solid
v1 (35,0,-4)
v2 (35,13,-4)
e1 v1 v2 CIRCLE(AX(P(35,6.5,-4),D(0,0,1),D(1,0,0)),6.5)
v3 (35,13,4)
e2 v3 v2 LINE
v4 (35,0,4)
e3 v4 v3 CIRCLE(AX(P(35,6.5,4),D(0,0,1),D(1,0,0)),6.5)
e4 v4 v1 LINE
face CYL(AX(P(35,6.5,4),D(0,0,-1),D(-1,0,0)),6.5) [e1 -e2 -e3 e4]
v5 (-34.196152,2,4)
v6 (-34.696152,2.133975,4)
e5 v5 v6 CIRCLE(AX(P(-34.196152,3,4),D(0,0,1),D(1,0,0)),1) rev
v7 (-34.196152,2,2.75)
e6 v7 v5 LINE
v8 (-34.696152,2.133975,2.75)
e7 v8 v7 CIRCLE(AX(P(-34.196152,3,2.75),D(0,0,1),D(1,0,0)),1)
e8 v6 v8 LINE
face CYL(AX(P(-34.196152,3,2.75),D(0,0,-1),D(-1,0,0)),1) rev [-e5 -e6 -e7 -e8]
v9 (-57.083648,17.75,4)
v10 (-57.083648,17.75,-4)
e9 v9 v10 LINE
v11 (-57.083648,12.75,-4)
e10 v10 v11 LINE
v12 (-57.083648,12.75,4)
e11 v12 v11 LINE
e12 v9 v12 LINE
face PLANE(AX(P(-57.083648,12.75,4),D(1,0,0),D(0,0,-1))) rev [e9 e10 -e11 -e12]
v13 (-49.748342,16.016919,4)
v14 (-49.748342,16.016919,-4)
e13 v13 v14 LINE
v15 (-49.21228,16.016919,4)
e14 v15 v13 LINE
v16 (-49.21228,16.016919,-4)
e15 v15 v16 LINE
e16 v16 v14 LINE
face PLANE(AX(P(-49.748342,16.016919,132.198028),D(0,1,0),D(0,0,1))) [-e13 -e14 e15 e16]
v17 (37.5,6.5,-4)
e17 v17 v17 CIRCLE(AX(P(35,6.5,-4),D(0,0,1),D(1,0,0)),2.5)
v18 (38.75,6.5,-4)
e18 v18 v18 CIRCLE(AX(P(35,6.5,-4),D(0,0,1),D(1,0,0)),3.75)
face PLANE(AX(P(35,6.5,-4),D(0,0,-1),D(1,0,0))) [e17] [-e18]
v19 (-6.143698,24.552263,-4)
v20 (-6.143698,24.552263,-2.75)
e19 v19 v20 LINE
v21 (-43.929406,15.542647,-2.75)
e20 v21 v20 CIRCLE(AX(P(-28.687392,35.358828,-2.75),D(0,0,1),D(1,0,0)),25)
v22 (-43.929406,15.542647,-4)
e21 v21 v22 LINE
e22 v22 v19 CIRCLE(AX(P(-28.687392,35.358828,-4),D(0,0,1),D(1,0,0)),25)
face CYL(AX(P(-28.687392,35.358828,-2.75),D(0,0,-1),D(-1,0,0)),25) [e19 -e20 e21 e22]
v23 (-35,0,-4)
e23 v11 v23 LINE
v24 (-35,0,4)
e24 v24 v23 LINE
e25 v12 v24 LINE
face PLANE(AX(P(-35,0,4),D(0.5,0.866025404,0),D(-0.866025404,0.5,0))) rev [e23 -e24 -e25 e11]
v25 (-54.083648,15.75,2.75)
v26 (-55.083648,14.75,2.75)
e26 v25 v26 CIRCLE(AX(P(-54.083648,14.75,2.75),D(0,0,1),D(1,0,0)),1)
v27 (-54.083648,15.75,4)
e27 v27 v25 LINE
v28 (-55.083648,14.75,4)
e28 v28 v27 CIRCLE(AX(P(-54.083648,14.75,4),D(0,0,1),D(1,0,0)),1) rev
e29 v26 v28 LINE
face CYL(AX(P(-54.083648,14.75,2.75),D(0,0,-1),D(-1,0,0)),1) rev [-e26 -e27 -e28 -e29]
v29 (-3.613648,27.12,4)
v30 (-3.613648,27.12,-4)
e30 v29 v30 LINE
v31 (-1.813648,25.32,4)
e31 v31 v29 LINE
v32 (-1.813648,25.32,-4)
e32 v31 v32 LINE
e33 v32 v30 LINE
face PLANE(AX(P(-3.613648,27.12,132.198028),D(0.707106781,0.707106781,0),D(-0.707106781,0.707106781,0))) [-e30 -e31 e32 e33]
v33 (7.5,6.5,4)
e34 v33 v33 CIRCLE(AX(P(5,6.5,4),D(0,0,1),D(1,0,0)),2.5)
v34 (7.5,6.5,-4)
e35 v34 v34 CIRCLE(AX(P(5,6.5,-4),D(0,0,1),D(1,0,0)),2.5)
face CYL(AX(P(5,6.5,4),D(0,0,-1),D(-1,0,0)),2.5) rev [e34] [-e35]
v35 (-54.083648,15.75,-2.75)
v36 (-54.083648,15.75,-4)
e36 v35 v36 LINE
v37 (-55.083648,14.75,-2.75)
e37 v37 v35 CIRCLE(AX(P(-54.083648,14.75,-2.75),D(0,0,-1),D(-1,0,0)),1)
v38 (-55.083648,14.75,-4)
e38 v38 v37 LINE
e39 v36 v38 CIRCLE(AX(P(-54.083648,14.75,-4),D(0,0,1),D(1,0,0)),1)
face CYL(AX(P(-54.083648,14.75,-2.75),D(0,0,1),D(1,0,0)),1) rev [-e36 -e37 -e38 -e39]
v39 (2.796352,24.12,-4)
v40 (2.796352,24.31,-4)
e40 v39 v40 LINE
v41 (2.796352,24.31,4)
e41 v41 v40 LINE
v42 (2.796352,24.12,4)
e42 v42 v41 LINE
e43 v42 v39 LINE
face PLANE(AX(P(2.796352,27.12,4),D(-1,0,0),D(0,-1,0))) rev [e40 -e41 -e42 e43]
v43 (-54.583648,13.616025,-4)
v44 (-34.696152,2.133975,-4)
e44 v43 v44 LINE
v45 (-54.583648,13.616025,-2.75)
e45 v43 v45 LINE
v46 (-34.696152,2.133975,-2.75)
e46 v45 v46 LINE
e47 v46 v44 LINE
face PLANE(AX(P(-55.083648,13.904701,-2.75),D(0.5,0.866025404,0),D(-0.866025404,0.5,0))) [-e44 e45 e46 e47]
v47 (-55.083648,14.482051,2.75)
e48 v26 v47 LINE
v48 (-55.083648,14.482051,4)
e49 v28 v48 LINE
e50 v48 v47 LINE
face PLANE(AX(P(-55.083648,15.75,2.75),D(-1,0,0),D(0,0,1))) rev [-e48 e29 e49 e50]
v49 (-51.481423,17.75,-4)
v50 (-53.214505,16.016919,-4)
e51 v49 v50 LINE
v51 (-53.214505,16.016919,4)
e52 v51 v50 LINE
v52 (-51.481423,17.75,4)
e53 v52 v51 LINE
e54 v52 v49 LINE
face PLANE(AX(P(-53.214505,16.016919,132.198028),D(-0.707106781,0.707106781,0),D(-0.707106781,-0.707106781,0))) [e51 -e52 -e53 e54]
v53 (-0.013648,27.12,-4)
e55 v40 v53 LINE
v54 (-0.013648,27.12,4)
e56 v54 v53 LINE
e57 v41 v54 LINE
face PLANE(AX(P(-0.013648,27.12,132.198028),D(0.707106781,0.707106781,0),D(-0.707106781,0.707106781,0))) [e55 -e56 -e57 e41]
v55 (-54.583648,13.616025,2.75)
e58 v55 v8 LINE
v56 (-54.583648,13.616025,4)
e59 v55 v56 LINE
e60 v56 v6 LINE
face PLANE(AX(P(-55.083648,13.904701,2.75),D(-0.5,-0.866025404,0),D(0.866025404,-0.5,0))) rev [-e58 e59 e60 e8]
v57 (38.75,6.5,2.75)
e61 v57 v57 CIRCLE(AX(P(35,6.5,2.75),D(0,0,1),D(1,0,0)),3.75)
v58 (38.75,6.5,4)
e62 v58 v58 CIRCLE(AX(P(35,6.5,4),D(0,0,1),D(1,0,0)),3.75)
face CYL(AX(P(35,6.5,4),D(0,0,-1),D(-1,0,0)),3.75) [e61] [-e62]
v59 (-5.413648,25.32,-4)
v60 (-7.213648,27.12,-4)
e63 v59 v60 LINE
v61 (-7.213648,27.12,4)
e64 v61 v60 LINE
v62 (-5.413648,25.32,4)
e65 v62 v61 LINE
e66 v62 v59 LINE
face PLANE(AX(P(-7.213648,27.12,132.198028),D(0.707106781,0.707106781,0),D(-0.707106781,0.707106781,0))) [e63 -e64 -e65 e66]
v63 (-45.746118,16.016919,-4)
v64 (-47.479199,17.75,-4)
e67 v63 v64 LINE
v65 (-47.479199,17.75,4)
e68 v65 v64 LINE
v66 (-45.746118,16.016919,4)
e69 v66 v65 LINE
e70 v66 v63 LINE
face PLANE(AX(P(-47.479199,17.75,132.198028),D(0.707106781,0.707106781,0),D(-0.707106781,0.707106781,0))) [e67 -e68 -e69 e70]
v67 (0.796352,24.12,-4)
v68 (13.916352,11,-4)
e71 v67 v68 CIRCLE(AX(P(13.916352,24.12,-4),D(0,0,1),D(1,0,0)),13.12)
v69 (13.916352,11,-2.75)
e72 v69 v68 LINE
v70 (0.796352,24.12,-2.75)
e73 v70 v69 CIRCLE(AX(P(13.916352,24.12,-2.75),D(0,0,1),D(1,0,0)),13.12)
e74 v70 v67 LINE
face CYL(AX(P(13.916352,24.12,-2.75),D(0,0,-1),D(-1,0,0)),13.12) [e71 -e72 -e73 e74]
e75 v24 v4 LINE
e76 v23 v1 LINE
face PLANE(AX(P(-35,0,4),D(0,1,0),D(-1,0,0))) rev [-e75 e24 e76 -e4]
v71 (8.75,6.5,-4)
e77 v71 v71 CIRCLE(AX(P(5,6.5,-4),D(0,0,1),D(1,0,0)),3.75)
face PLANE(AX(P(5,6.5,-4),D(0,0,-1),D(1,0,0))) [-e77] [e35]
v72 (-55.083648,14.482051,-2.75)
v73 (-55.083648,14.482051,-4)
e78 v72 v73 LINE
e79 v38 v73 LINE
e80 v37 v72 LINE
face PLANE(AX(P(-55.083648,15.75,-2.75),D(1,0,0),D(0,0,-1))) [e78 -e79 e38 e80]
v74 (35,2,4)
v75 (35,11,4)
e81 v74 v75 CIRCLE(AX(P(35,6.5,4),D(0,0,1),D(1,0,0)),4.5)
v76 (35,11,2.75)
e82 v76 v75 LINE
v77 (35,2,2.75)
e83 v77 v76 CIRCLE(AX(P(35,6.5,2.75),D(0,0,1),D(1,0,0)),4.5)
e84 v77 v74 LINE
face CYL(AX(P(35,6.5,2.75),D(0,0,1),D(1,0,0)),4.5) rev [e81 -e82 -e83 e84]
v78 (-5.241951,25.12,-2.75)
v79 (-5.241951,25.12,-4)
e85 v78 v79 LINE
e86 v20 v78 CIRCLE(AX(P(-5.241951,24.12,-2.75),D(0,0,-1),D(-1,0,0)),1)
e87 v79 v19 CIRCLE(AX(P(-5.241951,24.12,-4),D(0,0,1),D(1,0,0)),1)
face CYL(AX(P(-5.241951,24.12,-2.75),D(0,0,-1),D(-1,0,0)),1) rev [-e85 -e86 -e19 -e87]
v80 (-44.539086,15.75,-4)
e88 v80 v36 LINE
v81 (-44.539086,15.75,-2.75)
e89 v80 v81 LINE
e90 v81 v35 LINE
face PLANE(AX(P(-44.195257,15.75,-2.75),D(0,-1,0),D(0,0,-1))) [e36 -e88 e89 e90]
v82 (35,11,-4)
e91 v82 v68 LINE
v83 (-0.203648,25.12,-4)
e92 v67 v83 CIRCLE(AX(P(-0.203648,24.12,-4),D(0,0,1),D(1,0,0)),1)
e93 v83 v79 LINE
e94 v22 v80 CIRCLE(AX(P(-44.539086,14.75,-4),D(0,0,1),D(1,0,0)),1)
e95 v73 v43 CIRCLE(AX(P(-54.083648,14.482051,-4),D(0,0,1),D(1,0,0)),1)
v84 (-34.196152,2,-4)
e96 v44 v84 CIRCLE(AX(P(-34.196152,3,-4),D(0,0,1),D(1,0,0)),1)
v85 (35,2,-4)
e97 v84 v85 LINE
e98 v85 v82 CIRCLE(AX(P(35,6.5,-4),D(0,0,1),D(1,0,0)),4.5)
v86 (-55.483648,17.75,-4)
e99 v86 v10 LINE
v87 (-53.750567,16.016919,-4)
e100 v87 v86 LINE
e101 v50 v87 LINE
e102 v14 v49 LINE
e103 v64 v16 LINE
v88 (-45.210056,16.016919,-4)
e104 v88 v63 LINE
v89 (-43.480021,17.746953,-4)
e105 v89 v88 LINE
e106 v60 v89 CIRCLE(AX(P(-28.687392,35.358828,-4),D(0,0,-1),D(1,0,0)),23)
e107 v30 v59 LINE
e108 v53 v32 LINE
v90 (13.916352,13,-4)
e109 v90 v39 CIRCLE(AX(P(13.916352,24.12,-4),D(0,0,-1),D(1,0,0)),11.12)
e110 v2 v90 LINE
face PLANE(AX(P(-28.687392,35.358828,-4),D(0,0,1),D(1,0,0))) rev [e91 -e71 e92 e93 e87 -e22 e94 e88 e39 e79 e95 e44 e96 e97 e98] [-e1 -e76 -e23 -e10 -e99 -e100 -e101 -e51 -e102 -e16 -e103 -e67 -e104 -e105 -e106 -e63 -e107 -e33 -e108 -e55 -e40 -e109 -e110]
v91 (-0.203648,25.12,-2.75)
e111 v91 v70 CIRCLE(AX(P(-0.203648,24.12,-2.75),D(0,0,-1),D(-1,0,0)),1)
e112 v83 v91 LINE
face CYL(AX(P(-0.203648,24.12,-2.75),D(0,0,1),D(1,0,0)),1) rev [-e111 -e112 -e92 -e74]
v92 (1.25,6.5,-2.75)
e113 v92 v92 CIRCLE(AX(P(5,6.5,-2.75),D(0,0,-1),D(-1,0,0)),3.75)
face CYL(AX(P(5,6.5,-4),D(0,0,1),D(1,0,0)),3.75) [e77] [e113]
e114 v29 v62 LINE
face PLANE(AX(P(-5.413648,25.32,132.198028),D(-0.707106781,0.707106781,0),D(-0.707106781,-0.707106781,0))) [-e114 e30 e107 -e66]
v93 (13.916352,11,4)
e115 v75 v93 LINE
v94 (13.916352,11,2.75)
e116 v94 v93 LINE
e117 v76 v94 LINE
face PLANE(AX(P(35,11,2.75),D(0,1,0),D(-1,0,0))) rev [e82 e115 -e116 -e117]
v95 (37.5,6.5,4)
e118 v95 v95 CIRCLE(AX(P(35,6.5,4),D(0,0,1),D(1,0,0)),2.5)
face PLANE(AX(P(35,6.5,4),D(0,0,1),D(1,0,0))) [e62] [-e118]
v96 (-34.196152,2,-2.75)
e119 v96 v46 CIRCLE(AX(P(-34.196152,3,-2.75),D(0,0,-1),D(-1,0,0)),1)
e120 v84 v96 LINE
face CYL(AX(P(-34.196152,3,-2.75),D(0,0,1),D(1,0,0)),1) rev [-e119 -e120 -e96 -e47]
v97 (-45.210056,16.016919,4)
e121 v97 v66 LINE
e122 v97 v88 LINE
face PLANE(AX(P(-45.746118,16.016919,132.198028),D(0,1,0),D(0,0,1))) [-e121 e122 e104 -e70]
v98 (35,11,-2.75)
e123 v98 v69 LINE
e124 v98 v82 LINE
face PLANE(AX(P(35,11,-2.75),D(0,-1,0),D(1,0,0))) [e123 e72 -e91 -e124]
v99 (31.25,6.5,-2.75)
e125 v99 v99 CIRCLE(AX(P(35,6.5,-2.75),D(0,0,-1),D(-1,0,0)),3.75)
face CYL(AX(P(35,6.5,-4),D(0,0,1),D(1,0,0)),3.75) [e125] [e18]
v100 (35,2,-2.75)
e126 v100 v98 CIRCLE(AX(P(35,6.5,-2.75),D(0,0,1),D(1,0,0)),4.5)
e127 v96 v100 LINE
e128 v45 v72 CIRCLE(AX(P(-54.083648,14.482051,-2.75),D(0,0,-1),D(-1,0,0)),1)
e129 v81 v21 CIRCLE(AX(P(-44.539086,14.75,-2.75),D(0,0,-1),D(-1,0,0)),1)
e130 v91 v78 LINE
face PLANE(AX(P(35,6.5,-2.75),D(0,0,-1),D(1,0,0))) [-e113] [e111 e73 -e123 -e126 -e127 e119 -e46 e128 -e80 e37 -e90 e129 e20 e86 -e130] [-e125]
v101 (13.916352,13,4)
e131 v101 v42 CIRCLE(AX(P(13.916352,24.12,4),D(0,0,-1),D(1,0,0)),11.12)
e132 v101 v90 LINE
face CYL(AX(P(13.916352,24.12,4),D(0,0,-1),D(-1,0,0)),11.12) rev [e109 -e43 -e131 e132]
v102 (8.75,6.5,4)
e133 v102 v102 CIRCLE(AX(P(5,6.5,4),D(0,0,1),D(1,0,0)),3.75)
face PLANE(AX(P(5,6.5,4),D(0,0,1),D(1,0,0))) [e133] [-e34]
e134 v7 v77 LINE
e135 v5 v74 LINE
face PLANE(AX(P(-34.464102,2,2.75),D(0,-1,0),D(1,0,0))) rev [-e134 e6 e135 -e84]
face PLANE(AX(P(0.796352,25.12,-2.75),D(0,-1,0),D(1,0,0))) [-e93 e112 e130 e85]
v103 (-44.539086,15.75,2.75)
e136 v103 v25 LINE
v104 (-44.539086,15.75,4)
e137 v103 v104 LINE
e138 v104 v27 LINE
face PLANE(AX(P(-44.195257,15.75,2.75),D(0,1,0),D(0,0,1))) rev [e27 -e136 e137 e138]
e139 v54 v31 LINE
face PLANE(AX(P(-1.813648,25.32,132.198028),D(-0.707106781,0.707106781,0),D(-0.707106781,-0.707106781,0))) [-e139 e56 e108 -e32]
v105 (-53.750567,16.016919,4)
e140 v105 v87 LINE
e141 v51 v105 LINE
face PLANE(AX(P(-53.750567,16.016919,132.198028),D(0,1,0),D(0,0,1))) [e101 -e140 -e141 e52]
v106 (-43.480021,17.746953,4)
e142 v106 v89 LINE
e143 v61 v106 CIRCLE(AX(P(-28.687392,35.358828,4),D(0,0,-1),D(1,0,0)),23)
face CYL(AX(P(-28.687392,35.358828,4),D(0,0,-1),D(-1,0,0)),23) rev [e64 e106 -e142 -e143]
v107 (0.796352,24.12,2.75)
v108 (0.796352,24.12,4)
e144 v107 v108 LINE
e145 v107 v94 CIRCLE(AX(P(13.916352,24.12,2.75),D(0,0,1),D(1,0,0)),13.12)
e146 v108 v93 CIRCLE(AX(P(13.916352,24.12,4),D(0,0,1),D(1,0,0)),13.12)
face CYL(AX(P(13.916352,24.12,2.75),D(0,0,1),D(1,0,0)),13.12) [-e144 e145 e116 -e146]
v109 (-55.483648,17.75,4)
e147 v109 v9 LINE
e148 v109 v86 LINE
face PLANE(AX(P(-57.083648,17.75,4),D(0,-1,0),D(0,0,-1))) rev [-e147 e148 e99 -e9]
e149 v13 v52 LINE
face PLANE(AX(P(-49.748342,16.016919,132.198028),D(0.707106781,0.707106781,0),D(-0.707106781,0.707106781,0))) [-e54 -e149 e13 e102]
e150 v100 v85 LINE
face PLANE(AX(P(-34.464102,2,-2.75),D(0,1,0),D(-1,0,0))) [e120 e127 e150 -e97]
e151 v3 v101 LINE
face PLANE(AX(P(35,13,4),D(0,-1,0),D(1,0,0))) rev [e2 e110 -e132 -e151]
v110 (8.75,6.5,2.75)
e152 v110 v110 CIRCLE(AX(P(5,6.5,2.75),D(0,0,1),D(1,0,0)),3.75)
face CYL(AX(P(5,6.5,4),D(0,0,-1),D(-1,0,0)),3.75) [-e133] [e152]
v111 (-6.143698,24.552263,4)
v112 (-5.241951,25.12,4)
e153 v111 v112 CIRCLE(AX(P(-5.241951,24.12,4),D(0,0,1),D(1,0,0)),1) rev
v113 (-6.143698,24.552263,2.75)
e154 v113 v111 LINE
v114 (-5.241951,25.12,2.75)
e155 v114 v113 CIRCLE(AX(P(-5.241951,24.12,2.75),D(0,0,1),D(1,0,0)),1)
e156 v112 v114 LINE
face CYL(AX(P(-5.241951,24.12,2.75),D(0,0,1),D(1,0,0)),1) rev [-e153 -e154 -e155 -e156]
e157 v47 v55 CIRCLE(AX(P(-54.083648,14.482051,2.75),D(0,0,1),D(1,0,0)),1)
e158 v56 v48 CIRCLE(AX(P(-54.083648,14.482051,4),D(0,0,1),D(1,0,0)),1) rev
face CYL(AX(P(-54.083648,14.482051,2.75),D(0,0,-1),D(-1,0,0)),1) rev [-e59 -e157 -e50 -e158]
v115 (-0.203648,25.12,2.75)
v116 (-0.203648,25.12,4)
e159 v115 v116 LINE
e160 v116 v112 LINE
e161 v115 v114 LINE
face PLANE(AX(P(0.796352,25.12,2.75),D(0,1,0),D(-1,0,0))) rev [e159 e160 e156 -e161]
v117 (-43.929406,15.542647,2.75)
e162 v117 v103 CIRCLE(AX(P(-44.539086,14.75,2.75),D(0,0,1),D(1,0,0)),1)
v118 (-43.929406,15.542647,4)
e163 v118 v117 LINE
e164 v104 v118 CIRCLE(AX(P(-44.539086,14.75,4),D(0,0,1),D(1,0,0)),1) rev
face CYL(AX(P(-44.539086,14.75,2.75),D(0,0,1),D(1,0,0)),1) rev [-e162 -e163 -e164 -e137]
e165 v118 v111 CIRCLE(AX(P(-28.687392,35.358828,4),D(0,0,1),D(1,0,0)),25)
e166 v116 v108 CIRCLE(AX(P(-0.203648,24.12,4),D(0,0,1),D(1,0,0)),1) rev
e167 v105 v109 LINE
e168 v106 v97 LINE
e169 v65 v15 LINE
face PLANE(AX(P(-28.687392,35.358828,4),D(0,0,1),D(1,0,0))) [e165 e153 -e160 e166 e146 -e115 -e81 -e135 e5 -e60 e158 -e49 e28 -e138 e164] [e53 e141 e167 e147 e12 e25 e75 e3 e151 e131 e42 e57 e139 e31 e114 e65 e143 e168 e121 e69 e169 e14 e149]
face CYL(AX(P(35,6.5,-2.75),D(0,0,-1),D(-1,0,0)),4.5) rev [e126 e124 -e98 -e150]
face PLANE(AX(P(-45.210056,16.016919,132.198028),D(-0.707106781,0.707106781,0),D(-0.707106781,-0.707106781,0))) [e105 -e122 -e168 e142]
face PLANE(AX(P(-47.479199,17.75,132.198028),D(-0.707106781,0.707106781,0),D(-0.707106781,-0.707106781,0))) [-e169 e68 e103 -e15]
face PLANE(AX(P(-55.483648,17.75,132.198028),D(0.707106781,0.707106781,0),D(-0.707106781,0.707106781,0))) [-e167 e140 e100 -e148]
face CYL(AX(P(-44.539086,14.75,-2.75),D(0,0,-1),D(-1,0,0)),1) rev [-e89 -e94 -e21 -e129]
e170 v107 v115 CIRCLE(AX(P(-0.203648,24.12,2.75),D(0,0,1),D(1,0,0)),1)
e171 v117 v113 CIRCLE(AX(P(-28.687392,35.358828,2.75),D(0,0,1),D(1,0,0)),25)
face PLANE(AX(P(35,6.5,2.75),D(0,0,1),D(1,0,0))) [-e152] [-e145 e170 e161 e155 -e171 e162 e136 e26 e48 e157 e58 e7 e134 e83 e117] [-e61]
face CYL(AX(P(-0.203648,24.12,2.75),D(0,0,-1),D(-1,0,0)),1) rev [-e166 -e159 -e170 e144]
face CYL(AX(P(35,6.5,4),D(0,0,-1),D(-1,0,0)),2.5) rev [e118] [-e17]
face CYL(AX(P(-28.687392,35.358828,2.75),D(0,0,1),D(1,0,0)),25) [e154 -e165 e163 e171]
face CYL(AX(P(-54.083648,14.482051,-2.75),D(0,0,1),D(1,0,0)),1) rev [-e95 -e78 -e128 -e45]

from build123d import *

# Parameters (mm, degrees)
BOSS_EXTRUDE1_DEPTH     = 4
SKETCH2_R               = 2.5
CUT_EXTRUDE1_DEPTH      = 64.702725576
CUT_EXTRUDE2_DEPTH      = 1.25
SKETCH4_R               = 3.75
SKETCH4_R_2             = 2.5
BOSS_EXTRUDE2_DEPTH     = 1.25
CUT_EXTRUDE8_DEPTH      = 64.702725576
CUT_EXTRUDE8_DEPTH_BACK = 64.702725576
CUT_EXTRUDE9_DEPTH      = 64.702725576
CUT_EXTRUDE9_DEPTH_BACK = 64.702725576
FILLET5_R               = 1
FILLET6_R               = 1
FILLET7_R               = 1
FILLET8_R               = 1


with BuildPart() as part:
    # Sketch1 → Boss-Extrude1 (new, symmetric)
    with BuildSketch(Plane.XY):
        with BuildLine():
            Line((-35, 0), (35, 0))
            ThreePointArc((35, 0), (41.5, 6.5), (35, 13))
            Line((35, 13), (13.916352203, 13))
            ThreePointArc((13.916352203, 13), (6.053324797, 16.256972593), (2.796352203, 24.12))
            Line((2.796352203, 24.12), (2.796352203, 27.12))
            Line((2.796352203, 27.12), (-7.213647797, 27.12))
            ThreePointArc((-7.213647797, 27.12), (-22.934441841, 13.089935965), (-43.483647797, 17.75))
            Line((-43.483647797, 17.75), (-57.083647797, 17.75))
            Line((-57.083647797, 17.75), (-57.083647797, 12.75))
            Line((-57.083647797, 12.75), (-35, 0))
        make_face()
    extrude(amount=BOSS_EXTRUDE1_DEPTH, both=True)

    # Sketch2 → Cut-Extrude1 (cut, through all)
    with BuildSketch(Plane(origin=(0, 0, -4), x_dir=(-1, 0, 0), z_dir=(0, 0, -1))):
        with Locations((-35, 6.5)):
            Circle(SKETCH2_R)
        with Locations((-5, 6.5)):
            Circle(SKETCH2_R)
    extrude(amount=-CUT_EXTRUDE1_DEPTH, mode=Mode.SUBTRACT)

    # Sketch3 → Cut-Extrude2 (cut)
    with BuildSketch(Plane.XY.offset(4)):
        with BuildLine():
            Line((-44.195256898, 15.75), (-55.083647797, 15.75))
            Line((-55.083647797, 15.75), (-55.083647797, 13.904700538))
            Line((-55.083647797, 13.904700538), (-34.464101615, 2))
            Line((-34.464101615, 2), (35, 2))
            ThreePointArc((35, 2), (39.5, 6.5), (35, 11))
            Line((35, 11), (13.916352203, 11))
            ThreePointArc((13.916352203, 11), (4.639111234, 14.842759031), (0.796352203, 24.12))
            Line((0.796352203, 24.12), (0.796352203, 25.12))
            Line((0.796352203, 25.12), (-5.880235749, 25.12))
            ThreePointArc((-5.880235749, 25.12), (-22.748609603, 11.074453376), (-44.195256898, 15.75))
        make_face()
    cut_extrude2 = extrude(amount=-CUT_EXTRUDE2_DEPTH, mode=Mode.SUBTRACT)

    # Sketch4 → Boss-Extrude2 (add)
    # profile 1 of 2: a face of its own
    with BuildSketch(Plane.XY.offset(2.75)):
        with Locations((5, 6.5)):
            Circle(SKETCH4_R)
        with Locations(Location((5, 6.5, 0), (0, 0, 180))):
            Circle(SKETCH4_R_2, mode=Mode.SUBTRACT)
    # profile 2 of 2: a face of its own
    with BuildSketch(Plane.XY.offset(2.75)):
        with Locations((35, 6.5)):
            Circle(SKETCH4_R)
        with Locations(Location((35, 6.5, 0), (0, 0, 180))):
            Circle(SKETCH4_R_2, mode=Mode.SUBTRACT)
    boss_extrude2 = extrude(amount=BOSS_EXTRUDE2_DEPTH)

    # Mirror1: Cut-Extrude2, Boss-Extrude2 across plane
    add(cut_extrude2.mirror(Plane.XY), mode=Mode.SUBTRACT)
    add(boss_extrude2.mirror(Plane.XY))

    # Sketch6 → Cut-Extrude8 (cut, two sides: drawn at the far end of the back side and taken through both)
    with BuildSketch(Plane.XY.offset(4).offset(-CUT_EXTRUDE8_DEPTH_BACK)):
        Polygon((-201.988502331, 164.254854535), (-55.483647797, 17.75), (-53.750566679, 16.016918882), (-53.214504533, 16.016918882), (-51.481423415, 17.75), (-49.748342297, 16.016918882), (-49.212280151, 16.016918882), (-47.479199033, 17.75), (-45.746117916, 16.016918882), (-45.21005577, 16.016918882), (-43.476974652, 17.75), (103.027879883, 164.254854535), (103.027879883, 578.633159007), (-201.988502331, 578.633159007), align=None)
    extrude(amount=CUT_EXTRUDE8_DEPTH + CUT_EXTRUDE8_DEPTH_BACK, mode=Mode.SUBTRACT)

    # Sketch9 → Cut-Extrude9 (cut, two sides: drawn at the far end of the back side and taken through both)
    with BuildSketch(Plane.XY.offset(4).offset(-CUT_EXTRUDE9_DEPTH_BACK)):
        Polygon((-3.613647797, 27.12), (-7.213647797, 27.12), (-5.413647797, 25.32), align=None)
        Polygon((-0.013647797, 27.12), (-3.613647797, 27.12), (-1.813647797, 25.32), align=None)
        Polygon((2.796352203, 27.12), (-0.013647797, 27.12), (2.796352203, 24.31), align=None)
    extrude(amount=CUT_EXTRUDE9_DEPTH + CUT_EXTRUDE9_DEPTH_BACK, mode=Mode.SUBTRACT)

    # Fillet5
    fillet5_edges = [part.edges().sort_by_distance(p)[0] for p in [
        (-55.083647797, 15.75, 3.375),
    ]]
    fillet(fillet5_edges, radius=FILLET5_R)

    # Fillet6
    fillet6_edges = [part.edges().sort_by_distance(p)[0] for p in [
        (-44.195256898, 15.75, 3.375),
        (-55.083647797, 13.904700538, 3.375),
    ]]
    fillet(fillet6_edges, radius=FILLET6_R)

    # Fillet7
    fillet7_edges = [part.edges().sort_by_distance(p)[0] for p in [
        (0.796352203, 25.12, 3.375),
        (-34.464101615, 2, 3.375),
        (-5.880235749, 25.12, 3.375),
    ]]
    fillet(fillet7_edges, radius=FILLET7_R - 0.0001)  # a hair under: the kernel refuses the full size

    # Fillet8
    fillet8_edges = [part.edges().sort_by_distance(p)[0] for p in [
        (-55.083647797, 13.904700538, -3.375),
        (-34.464101615, 2, -3.375),
        (-44.195256898, 15.75, -3.375),
        (-55.083647797, 15.75, -3.375),
        (-5.880235749, 25.12, -3.375),
        (0.796352203, 25.12, -3.375),
    ]]
    fillet(fillet8_edges, radius=FILLET8_R - 0.0001)  # a hair under: the kernel refuses the full size


solid = part.part
